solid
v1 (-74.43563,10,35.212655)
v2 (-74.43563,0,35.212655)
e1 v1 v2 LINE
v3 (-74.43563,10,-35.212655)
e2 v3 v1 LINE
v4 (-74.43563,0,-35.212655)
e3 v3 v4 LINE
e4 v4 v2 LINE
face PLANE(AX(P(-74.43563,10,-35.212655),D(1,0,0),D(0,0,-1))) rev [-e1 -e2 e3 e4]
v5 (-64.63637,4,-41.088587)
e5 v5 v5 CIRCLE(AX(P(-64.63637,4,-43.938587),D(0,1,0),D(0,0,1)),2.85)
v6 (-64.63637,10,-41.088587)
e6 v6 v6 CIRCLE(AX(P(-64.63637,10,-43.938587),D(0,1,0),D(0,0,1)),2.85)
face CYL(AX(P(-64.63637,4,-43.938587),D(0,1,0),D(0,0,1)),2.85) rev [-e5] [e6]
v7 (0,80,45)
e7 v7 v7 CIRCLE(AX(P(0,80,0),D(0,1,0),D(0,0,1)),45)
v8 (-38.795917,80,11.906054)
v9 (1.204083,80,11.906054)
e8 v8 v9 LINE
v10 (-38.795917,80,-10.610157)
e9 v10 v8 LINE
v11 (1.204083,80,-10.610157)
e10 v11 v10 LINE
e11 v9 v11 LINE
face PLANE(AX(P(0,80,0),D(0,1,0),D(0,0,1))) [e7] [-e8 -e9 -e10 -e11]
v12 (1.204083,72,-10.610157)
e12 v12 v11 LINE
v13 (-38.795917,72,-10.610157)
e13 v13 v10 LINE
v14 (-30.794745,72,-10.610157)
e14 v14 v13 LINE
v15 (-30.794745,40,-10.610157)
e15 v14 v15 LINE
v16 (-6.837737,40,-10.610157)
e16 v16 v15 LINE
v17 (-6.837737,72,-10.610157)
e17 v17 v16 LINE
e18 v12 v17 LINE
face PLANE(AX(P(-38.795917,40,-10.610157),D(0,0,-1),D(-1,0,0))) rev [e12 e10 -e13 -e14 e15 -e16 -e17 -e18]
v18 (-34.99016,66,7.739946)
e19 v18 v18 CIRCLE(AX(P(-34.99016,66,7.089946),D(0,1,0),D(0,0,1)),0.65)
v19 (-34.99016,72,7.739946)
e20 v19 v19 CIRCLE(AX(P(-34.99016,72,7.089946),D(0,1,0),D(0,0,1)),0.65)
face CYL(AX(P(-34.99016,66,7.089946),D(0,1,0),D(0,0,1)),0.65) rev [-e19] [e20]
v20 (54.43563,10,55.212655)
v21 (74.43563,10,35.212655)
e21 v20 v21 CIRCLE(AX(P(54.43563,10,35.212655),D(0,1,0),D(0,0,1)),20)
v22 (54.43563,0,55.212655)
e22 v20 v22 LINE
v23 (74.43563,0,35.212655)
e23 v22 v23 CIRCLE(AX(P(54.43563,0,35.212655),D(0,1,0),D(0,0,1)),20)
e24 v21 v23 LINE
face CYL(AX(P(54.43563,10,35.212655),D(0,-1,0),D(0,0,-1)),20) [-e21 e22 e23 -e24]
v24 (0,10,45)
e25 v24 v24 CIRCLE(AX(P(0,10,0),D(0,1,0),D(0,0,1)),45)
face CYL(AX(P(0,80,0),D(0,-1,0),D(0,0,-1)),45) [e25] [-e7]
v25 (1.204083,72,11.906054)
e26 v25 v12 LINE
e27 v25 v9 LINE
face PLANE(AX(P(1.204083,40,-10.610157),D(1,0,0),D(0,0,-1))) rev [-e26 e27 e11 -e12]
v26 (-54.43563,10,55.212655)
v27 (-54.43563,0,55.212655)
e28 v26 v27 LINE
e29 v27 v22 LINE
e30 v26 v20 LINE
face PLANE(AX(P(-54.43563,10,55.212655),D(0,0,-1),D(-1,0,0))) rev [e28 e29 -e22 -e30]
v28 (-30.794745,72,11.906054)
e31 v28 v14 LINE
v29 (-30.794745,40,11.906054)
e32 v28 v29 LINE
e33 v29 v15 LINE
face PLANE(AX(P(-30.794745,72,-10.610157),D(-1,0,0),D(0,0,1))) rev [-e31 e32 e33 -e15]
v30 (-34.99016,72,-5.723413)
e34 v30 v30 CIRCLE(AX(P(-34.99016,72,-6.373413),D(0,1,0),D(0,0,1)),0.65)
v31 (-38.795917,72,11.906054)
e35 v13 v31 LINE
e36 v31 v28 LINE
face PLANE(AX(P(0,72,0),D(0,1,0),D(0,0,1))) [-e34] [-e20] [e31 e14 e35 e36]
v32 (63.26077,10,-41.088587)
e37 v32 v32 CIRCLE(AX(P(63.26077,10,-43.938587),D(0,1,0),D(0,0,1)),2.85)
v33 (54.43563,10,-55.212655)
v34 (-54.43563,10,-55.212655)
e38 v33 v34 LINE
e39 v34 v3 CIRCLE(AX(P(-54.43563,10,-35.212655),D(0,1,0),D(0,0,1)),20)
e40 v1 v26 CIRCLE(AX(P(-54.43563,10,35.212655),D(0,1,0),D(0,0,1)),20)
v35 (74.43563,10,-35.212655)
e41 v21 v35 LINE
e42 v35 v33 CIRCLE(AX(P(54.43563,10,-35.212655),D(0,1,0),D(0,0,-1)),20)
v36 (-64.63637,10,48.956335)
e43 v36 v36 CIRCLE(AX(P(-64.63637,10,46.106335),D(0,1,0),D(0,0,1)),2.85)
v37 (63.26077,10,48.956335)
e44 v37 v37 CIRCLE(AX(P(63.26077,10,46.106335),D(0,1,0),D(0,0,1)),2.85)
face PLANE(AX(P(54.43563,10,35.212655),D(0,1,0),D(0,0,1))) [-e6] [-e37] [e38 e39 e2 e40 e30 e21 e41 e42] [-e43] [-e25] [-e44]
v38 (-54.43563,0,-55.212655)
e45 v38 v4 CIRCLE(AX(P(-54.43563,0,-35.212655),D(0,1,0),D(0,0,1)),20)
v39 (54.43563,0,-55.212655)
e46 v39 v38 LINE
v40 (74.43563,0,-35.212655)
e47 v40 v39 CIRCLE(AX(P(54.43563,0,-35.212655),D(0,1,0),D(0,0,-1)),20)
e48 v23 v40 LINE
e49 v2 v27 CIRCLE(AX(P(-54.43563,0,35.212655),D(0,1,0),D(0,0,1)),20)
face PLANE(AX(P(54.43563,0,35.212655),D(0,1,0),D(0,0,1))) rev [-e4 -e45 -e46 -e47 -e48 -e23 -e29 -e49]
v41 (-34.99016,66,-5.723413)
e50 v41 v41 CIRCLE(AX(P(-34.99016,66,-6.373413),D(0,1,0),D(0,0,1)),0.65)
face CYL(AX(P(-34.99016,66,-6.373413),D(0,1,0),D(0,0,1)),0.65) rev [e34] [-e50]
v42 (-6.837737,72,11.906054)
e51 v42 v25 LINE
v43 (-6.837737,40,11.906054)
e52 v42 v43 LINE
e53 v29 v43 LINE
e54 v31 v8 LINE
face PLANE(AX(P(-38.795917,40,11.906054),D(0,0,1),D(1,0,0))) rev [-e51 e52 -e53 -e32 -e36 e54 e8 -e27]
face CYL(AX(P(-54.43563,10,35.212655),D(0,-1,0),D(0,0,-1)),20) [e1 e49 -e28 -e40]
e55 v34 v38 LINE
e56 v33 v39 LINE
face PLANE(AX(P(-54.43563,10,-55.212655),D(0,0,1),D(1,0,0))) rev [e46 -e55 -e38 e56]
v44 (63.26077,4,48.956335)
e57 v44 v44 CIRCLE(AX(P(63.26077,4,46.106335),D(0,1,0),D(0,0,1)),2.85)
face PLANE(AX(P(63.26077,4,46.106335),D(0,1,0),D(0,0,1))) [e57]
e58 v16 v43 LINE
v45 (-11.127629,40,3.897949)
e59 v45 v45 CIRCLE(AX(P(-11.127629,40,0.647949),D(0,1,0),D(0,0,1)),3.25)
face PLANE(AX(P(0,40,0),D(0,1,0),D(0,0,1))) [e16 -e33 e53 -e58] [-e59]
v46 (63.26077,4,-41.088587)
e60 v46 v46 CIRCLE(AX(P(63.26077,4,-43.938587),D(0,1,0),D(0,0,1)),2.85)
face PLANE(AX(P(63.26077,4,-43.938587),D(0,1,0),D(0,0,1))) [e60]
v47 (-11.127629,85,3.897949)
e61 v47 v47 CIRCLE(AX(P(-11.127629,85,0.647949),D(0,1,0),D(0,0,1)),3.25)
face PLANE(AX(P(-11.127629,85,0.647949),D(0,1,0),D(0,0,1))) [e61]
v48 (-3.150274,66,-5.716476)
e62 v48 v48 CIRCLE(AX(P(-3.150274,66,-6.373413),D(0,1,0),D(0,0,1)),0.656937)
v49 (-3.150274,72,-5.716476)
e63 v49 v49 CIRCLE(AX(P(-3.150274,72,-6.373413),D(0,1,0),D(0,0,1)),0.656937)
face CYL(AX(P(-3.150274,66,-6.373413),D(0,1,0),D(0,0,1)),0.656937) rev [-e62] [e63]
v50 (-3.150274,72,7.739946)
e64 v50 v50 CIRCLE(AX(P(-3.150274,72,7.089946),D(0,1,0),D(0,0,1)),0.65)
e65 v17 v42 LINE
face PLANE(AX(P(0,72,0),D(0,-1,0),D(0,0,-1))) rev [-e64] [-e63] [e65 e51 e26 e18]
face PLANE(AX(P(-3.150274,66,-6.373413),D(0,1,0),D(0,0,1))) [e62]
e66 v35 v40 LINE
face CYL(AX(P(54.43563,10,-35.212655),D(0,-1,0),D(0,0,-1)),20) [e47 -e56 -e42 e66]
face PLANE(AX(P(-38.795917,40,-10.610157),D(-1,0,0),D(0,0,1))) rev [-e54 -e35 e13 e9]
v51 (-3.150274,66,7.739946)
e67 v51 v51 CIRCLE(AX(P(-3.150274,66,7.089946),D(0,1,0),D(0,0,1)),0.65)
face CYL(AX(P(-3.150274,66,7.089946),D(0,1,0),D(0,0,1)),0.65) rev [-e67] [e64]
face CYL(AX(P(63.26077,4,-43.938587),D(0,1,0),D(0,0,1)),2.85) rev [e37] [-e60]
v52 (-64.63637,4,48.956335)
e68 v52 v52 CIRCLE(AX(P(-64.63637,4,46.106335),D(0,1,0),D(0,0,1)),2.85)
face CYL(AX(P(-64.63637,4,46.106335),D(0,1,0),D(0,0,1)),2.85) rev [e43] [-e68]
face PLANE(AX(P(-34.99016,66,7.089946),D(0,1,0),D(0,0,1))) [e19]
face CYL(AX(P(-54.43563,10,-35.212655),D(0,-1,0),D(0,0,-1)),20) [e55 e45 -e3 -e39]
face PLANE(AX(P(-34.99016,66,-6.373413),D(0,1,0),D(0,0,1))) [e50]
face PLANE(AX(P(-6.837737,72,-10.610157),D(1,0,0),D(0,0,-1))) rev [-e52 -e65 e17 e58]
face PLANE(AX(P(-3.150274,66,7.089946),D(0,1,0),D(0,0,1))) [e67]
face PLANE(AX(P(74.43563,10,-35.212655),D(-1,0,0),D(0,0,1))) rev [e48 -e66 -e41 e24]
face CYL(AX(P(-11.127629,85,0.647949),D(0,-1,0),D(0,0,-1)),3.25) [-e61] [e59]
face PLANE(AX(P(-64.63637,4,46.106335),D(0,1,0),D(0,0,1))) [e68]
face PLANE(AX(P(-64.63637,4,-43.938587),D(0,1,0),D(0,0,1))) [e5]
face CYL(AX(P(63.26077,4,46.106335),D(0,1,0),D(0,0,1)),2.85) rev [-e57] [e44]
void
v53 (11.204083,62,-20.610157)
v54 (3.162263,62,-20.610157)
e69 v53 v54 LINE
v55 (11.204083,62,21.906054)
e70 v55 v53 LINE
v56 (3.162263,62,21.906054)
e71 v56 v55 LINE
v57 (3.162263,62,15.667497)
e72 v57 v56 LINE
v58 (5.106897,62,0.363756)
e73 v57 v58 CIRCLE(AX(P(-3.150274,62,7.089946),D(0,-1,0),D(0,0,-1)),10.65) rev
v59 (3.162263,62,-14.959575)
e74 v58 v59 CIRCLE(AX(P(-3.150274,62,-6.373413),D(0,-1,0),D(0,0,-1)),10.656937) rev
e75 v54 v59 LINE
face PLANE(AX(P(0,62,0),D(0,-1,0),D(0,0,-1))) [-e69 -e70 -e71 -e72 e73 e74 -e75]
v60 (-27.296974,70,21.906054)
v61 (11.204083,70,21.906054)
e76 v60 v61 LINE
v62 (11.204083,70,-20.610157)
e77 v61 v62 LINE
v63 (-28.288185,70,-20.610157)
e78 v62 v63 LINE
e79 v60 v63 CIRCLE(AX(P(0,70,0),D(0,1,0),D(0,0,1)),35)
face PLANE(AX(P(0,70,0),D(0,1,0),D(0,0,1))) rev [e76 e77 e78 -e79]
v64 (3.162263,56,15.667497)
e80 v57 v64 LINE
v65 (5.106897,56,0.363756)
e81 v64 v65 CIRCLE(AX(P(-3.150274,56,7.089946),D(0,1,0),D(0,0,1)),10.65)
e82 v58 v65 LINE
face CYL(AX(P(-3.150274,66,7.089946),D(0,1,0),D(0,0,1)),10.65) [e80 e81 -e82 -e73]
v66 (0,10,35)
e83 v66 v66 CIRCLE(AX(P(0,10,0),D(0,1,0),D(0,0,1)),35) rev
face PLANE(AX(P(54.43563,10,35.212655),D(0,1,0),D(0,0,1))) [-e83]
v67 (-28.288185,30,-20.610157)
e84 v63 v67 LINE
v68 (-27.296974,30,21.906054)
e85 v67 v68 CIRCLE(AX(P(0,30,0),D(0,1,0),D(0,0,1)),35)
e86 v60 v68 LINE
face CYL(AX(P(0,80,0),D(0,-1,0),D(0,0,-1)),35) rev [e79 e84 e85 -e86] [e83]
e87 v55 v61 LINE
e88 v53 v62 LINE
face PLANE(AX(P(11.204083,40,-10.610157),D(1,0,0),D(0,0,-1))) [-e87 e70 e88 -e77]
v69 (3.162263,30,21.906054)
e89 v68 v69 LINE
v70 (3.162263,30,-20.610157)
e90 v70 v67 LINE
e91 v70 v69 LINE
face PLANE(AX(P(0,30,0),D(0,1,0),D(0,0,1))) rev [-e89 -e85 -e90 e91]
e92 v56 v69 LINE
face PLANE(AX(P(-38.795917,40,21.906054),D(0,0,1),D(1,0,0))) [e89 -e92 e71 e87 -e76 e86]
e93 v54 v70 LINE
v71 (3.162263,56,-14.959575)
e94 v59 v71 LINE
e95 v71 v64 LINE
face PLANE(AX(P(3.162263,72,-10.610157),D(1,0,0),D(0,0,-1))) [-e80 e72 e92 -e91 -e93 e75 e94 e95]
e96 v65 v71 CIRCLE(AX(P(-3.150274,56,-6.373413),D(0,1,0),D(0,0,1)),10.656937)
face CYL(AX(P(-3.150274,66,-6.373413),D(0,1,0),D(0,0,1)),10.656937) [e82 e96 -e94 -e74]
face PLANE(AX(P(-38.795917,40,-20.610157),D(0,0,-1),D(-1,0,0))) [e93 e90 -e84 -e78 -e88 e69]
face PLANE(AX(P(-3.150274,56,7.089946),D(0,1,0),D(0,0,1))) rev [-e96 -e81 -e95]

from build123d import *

# Parameters (mm, degrees)
BOSS_EXTRUDE2_DEPTH = 10
SKETCH3_R           = 45
BOSS_EXTRUDE3_DEPTH = 70
SKETCH5_W           = 40
SKETCH5_H           = 22.516210705
CUT_EXTRUDE1_DEPTH  = 40
SKETCH6_W           = 8.00117247
SKETCH6_H           = 22.516210705
SKETCH6_W_2         = 8.041819545
BOSS_EXTRUDE4_DEPTH = 32
SKETCH8_R           = 0.656937265
SKETCH8_R_2         = 0.65
CUT_EXTRUDE2_DEPTH  = 6
SHELL16_START       = 10
SHELL16_DEPTH       = 60
SHELL16_2_DEPTH     = 20
SHELL16_START_2     = 30
SHELL16_3_OUTLINE_W = 8.041819545
SHELL16_3_OUTLINE_H = 42.516210705
SHELL16_3_DEPTH     = 26
SHELL16_START_3     = 56
SHELL16_4_DEPTH     = 6
SKETCH9_R           = 2.85
CUT_EXTRUDE3_DEPTH  = 6
SKETCH10_R          = 3.25
BOSS_EXTRUDE5_DEPTH = 45


# Read off the part's stored shape, not the designer's step: Shell16
with BuildPart() as part:
    # Sketch2 → Boss-Extrude2 (new body)
    with BuildSketch(Plane(origin=(0, 0, 0), x_dir=(1, 0, 0), z_dir=(0, 1, 0))):
        with BuildLine():
            Line((-54.435630286, 55.212655463), (54.435630286, 55.212655463))
            ThreePointArc((54.435630286, 55.212655463), (68.577765909, 49.354791087), (74.435630286, 35.212655463))
            Line((74.435630286, 35.212655463), (74.435630286, -35.212655463))
            ThreePointArc((74.435630286, -35.212655463), (68.577765909, -49.354791087), (54.435630286, -55.212655463))
            Line((54.435630286, -55.212655463), (-54.435630286, -55.212655463))
            ThreePointArc((-54.435630286, -55.212655463), (-68.577765909, -49.354791087), (-74.435630286, -35.212655463))
            Line((-74.435630286, -35.212655463), (-74.435630286, 35.212655463))
            ThreePointArc((-74.435630286, 35.212655463), (-68.577765909, 49.354791087), (-54.435630286, 55.212655463))
        make_face()
    extrude(amount=BOSS_EXTRUDE2_DEPTH)

    # Sketch3 → Boss-Extrude3 (add)
    with BuildSketch(Plane(origin=(0, 10, 0), x_dir=(1, 0, 0), z_dir=(0, 1, 0))):
        with Locations(Location((0, 0, 0), (0, 0, 270))):
            Circle(SKETCH3_R)
    extrude(amount=BOSS_EXTRUDE3_DEPTH)

    # Sketch5 → Cut-Extrude1 (cut)
    with BuildSketch(Plane(origin=(0, 80, 0), x_dir=(1, 0, 0), z_dir=(0, 1, 0))):
        with Locations((-18.795917007, -0.647948509)):
            Rectangle(SKETCH5_W, SKETCH5_H)
    extrude(amount=-CUT_EXTRUDE1_DEPTH, mode=Mode.SUBTRACT)

    # Sketch6 → Boss-Extrude4 (add)
    with BuildSketch(Plane(origin=(0, 40, 0), x_dir=(1, 0, 0), z_dir=(0, 1, 0))):
        with Locations((-34.795330772, -0.647948509)):
            Rectangle(SKETCH6_W, SKETCH6_H)
        with Locations((-2.81682678, -0.647948509)):
            Rectangle(SKETCH6_W_2, SKETCH6_H)
    extrude(amount=BOSS_EXTRUDE4_DEPTH)

    # Sketch8 → Cut-Extrude2 (cut)
    with BuildSketch(Plane(origin=(0, 72, 0), x_dir=(1, 0, 0), z_dir=(0, 1, 0))):
        with Locations(Location((-3.150273661, 6.373412823, 0), (0, 0, 270))):
            Circle(SKETCH8_R)
        with Locations(Location((-3.150273661, -7.089946011, 0), (0, 0, 270))):
            Circle(SKETCH8_R_2)
        with Locations(Location((-34.990160193, 6.373412823, 0), (0, 0, 270))):
            Circle(SKETCH8_R_2)
        with Locations(Location((-34.990160193, -7.089946011, 0), (0, 0, 270))):
            Circle(SKETCH8_R_2)
    extrude(amount=-CUT_EXTRUDE2_DEPTH, mode=Mode.SUBTRACT)

    # Shell16 outline → Shell16 (cut)
    with BuildSketch(Plane(origin=(0, 0, 0), x_dir=(1, 0, 0), z_dir=(0, 1, 0)).offset(SHELL16_START)):
        with BuildLine():
            ThreePointArc((-27.296974268, -21.906053862), (34.990492106, 0.815758643), (-28.28818543, 20.610156843))
            Line((-28.28818543, 20.610156843), (11.204082993, 20.610156843))
            Line((11.204082993, 20.610156843), (11.204082993, -21.906053862))
            Line((11.204082993, -21.906053862), (-27.296974268, -21.906053862))
        make_face()
    extrude(amount=SHELL16_DEPTH, mode=Mode.SUBTRACT)

    # Shell16 2 outline → Shell16 2 (cut)
    with BuildSketch(Plane(origin=(0, 0, 0), x_dir=(1, 0, 0), z_dir=(0, 1, 0)).offset(SHELL16_START)):
        with BuildLine():
            ThreePointArc((-28.28818543, 20.610156843), (-34.990492106, -0.815758643), (-27.296974268, -21.906053862))
            Line((-27.296974268, -21.906053862), (11.204082993, -21.906053862))
            Line((11.204082993, -21.906053862), (11.204082993, 20.610156843))
            Line((11.204082993, 20.610156843), (-28.28818543, 20.610156843))
        make_face()
    extrude(amount=SHELL16_2_DEPTH, mode=Mode.SUBTRACT)

    # Shell16 3 outline → Shell16 3 (cut)
    with BuildSketch(Plane(origin=(0, 0, 0), x_dir=(1, 0, 0), z_dir=(0, 1, 0)).offset(SHELL16_START_2)):
        with Locations((7.183173221, -0.647948509)):
            Rectangle(SHELL16_3_OUTLINE_W, SHELL16_3_OUTLINE_H)
    extrude(amount=SHELL16_3_DEPTH, mode=Mode.SUBTRACT)

    # Shell16 4 outline → Shell16 4 (cut)
    with BuildSketch(Plane(origin=(0, 0, 0), x_dir=(1, 0, 0), z_dir=(0, 1, 0)).offset(SHELL16_START_3)):
        with BuildLine():
            Line((11.204082993, 20.610156843), (3.162263448, 20.610156843))
            Line((3.162263448, 20.610156843), (3.162263448, 14.95957536))
            ThreePointArc((3.162263448, 14.95957536), (7.421869806, 7.715088784), (5.106897043, -0.363756008))
            ThreePointArc((5.106897043, -0.363756008), (7.414773238, -8.432437732), (3.162263448, -15.667496667))
            Line((3.162263448, -15.667496667), (3.162263448, -21.906053862))
            Line((3.162263448, -21.906053862), (11.204082993, -21.906053862))
            Line((11.204082993, -21.906053862), (11.204082993, 20.610156843))
        make_face()
    extrude(amount=SHELL16_4_DEPTH, mode=Mode.SUBTRACT)

    # Sketch9 → Cut-Extrude3 (cut)
    with BuildSketch(Plane(origin=(0, 10, 0), x_dir=(1, 0, 0), z_dir=(0, 1, 0))):
        with Locations(Location((-64.63637004, 43.938587161, 0), (0, 0, 270))):
            Circle(SKETCH9_R)
        with Locations(Location((63.260769817, 43.938587161, 0), (0, 0, 270))):
            Circle(SKETCH9_R)
        with Locations(Location((-64.63637004, -46.106335294, 0), (0, 0, 270))):
            Circle(SKETCH9_R)
        with Locations(Location((63.260769817, -46.106335294, 0), (0, 0, 270))):
            Circle(SKETCH9_R)
    extrude(amount=-CUT_EXTRUDE3_DEPTH, mode=Mode.SUBTRACT)

    # Sketch10 → Boss-Extrude5 (add)
    with BuildSketch(Plane(origin=(0, 40, 0), x_dir=(1, 0, 0), z_dir=(0, 1, 0))):
        with Locations(Location((-11.127628751, -0.64794851, 0), (0, 0, 270))):
            Circle(SKETCH10_R)
    extrude(amount=BOSS_EXTRUDE5_DEPTH)


solid = part.part
